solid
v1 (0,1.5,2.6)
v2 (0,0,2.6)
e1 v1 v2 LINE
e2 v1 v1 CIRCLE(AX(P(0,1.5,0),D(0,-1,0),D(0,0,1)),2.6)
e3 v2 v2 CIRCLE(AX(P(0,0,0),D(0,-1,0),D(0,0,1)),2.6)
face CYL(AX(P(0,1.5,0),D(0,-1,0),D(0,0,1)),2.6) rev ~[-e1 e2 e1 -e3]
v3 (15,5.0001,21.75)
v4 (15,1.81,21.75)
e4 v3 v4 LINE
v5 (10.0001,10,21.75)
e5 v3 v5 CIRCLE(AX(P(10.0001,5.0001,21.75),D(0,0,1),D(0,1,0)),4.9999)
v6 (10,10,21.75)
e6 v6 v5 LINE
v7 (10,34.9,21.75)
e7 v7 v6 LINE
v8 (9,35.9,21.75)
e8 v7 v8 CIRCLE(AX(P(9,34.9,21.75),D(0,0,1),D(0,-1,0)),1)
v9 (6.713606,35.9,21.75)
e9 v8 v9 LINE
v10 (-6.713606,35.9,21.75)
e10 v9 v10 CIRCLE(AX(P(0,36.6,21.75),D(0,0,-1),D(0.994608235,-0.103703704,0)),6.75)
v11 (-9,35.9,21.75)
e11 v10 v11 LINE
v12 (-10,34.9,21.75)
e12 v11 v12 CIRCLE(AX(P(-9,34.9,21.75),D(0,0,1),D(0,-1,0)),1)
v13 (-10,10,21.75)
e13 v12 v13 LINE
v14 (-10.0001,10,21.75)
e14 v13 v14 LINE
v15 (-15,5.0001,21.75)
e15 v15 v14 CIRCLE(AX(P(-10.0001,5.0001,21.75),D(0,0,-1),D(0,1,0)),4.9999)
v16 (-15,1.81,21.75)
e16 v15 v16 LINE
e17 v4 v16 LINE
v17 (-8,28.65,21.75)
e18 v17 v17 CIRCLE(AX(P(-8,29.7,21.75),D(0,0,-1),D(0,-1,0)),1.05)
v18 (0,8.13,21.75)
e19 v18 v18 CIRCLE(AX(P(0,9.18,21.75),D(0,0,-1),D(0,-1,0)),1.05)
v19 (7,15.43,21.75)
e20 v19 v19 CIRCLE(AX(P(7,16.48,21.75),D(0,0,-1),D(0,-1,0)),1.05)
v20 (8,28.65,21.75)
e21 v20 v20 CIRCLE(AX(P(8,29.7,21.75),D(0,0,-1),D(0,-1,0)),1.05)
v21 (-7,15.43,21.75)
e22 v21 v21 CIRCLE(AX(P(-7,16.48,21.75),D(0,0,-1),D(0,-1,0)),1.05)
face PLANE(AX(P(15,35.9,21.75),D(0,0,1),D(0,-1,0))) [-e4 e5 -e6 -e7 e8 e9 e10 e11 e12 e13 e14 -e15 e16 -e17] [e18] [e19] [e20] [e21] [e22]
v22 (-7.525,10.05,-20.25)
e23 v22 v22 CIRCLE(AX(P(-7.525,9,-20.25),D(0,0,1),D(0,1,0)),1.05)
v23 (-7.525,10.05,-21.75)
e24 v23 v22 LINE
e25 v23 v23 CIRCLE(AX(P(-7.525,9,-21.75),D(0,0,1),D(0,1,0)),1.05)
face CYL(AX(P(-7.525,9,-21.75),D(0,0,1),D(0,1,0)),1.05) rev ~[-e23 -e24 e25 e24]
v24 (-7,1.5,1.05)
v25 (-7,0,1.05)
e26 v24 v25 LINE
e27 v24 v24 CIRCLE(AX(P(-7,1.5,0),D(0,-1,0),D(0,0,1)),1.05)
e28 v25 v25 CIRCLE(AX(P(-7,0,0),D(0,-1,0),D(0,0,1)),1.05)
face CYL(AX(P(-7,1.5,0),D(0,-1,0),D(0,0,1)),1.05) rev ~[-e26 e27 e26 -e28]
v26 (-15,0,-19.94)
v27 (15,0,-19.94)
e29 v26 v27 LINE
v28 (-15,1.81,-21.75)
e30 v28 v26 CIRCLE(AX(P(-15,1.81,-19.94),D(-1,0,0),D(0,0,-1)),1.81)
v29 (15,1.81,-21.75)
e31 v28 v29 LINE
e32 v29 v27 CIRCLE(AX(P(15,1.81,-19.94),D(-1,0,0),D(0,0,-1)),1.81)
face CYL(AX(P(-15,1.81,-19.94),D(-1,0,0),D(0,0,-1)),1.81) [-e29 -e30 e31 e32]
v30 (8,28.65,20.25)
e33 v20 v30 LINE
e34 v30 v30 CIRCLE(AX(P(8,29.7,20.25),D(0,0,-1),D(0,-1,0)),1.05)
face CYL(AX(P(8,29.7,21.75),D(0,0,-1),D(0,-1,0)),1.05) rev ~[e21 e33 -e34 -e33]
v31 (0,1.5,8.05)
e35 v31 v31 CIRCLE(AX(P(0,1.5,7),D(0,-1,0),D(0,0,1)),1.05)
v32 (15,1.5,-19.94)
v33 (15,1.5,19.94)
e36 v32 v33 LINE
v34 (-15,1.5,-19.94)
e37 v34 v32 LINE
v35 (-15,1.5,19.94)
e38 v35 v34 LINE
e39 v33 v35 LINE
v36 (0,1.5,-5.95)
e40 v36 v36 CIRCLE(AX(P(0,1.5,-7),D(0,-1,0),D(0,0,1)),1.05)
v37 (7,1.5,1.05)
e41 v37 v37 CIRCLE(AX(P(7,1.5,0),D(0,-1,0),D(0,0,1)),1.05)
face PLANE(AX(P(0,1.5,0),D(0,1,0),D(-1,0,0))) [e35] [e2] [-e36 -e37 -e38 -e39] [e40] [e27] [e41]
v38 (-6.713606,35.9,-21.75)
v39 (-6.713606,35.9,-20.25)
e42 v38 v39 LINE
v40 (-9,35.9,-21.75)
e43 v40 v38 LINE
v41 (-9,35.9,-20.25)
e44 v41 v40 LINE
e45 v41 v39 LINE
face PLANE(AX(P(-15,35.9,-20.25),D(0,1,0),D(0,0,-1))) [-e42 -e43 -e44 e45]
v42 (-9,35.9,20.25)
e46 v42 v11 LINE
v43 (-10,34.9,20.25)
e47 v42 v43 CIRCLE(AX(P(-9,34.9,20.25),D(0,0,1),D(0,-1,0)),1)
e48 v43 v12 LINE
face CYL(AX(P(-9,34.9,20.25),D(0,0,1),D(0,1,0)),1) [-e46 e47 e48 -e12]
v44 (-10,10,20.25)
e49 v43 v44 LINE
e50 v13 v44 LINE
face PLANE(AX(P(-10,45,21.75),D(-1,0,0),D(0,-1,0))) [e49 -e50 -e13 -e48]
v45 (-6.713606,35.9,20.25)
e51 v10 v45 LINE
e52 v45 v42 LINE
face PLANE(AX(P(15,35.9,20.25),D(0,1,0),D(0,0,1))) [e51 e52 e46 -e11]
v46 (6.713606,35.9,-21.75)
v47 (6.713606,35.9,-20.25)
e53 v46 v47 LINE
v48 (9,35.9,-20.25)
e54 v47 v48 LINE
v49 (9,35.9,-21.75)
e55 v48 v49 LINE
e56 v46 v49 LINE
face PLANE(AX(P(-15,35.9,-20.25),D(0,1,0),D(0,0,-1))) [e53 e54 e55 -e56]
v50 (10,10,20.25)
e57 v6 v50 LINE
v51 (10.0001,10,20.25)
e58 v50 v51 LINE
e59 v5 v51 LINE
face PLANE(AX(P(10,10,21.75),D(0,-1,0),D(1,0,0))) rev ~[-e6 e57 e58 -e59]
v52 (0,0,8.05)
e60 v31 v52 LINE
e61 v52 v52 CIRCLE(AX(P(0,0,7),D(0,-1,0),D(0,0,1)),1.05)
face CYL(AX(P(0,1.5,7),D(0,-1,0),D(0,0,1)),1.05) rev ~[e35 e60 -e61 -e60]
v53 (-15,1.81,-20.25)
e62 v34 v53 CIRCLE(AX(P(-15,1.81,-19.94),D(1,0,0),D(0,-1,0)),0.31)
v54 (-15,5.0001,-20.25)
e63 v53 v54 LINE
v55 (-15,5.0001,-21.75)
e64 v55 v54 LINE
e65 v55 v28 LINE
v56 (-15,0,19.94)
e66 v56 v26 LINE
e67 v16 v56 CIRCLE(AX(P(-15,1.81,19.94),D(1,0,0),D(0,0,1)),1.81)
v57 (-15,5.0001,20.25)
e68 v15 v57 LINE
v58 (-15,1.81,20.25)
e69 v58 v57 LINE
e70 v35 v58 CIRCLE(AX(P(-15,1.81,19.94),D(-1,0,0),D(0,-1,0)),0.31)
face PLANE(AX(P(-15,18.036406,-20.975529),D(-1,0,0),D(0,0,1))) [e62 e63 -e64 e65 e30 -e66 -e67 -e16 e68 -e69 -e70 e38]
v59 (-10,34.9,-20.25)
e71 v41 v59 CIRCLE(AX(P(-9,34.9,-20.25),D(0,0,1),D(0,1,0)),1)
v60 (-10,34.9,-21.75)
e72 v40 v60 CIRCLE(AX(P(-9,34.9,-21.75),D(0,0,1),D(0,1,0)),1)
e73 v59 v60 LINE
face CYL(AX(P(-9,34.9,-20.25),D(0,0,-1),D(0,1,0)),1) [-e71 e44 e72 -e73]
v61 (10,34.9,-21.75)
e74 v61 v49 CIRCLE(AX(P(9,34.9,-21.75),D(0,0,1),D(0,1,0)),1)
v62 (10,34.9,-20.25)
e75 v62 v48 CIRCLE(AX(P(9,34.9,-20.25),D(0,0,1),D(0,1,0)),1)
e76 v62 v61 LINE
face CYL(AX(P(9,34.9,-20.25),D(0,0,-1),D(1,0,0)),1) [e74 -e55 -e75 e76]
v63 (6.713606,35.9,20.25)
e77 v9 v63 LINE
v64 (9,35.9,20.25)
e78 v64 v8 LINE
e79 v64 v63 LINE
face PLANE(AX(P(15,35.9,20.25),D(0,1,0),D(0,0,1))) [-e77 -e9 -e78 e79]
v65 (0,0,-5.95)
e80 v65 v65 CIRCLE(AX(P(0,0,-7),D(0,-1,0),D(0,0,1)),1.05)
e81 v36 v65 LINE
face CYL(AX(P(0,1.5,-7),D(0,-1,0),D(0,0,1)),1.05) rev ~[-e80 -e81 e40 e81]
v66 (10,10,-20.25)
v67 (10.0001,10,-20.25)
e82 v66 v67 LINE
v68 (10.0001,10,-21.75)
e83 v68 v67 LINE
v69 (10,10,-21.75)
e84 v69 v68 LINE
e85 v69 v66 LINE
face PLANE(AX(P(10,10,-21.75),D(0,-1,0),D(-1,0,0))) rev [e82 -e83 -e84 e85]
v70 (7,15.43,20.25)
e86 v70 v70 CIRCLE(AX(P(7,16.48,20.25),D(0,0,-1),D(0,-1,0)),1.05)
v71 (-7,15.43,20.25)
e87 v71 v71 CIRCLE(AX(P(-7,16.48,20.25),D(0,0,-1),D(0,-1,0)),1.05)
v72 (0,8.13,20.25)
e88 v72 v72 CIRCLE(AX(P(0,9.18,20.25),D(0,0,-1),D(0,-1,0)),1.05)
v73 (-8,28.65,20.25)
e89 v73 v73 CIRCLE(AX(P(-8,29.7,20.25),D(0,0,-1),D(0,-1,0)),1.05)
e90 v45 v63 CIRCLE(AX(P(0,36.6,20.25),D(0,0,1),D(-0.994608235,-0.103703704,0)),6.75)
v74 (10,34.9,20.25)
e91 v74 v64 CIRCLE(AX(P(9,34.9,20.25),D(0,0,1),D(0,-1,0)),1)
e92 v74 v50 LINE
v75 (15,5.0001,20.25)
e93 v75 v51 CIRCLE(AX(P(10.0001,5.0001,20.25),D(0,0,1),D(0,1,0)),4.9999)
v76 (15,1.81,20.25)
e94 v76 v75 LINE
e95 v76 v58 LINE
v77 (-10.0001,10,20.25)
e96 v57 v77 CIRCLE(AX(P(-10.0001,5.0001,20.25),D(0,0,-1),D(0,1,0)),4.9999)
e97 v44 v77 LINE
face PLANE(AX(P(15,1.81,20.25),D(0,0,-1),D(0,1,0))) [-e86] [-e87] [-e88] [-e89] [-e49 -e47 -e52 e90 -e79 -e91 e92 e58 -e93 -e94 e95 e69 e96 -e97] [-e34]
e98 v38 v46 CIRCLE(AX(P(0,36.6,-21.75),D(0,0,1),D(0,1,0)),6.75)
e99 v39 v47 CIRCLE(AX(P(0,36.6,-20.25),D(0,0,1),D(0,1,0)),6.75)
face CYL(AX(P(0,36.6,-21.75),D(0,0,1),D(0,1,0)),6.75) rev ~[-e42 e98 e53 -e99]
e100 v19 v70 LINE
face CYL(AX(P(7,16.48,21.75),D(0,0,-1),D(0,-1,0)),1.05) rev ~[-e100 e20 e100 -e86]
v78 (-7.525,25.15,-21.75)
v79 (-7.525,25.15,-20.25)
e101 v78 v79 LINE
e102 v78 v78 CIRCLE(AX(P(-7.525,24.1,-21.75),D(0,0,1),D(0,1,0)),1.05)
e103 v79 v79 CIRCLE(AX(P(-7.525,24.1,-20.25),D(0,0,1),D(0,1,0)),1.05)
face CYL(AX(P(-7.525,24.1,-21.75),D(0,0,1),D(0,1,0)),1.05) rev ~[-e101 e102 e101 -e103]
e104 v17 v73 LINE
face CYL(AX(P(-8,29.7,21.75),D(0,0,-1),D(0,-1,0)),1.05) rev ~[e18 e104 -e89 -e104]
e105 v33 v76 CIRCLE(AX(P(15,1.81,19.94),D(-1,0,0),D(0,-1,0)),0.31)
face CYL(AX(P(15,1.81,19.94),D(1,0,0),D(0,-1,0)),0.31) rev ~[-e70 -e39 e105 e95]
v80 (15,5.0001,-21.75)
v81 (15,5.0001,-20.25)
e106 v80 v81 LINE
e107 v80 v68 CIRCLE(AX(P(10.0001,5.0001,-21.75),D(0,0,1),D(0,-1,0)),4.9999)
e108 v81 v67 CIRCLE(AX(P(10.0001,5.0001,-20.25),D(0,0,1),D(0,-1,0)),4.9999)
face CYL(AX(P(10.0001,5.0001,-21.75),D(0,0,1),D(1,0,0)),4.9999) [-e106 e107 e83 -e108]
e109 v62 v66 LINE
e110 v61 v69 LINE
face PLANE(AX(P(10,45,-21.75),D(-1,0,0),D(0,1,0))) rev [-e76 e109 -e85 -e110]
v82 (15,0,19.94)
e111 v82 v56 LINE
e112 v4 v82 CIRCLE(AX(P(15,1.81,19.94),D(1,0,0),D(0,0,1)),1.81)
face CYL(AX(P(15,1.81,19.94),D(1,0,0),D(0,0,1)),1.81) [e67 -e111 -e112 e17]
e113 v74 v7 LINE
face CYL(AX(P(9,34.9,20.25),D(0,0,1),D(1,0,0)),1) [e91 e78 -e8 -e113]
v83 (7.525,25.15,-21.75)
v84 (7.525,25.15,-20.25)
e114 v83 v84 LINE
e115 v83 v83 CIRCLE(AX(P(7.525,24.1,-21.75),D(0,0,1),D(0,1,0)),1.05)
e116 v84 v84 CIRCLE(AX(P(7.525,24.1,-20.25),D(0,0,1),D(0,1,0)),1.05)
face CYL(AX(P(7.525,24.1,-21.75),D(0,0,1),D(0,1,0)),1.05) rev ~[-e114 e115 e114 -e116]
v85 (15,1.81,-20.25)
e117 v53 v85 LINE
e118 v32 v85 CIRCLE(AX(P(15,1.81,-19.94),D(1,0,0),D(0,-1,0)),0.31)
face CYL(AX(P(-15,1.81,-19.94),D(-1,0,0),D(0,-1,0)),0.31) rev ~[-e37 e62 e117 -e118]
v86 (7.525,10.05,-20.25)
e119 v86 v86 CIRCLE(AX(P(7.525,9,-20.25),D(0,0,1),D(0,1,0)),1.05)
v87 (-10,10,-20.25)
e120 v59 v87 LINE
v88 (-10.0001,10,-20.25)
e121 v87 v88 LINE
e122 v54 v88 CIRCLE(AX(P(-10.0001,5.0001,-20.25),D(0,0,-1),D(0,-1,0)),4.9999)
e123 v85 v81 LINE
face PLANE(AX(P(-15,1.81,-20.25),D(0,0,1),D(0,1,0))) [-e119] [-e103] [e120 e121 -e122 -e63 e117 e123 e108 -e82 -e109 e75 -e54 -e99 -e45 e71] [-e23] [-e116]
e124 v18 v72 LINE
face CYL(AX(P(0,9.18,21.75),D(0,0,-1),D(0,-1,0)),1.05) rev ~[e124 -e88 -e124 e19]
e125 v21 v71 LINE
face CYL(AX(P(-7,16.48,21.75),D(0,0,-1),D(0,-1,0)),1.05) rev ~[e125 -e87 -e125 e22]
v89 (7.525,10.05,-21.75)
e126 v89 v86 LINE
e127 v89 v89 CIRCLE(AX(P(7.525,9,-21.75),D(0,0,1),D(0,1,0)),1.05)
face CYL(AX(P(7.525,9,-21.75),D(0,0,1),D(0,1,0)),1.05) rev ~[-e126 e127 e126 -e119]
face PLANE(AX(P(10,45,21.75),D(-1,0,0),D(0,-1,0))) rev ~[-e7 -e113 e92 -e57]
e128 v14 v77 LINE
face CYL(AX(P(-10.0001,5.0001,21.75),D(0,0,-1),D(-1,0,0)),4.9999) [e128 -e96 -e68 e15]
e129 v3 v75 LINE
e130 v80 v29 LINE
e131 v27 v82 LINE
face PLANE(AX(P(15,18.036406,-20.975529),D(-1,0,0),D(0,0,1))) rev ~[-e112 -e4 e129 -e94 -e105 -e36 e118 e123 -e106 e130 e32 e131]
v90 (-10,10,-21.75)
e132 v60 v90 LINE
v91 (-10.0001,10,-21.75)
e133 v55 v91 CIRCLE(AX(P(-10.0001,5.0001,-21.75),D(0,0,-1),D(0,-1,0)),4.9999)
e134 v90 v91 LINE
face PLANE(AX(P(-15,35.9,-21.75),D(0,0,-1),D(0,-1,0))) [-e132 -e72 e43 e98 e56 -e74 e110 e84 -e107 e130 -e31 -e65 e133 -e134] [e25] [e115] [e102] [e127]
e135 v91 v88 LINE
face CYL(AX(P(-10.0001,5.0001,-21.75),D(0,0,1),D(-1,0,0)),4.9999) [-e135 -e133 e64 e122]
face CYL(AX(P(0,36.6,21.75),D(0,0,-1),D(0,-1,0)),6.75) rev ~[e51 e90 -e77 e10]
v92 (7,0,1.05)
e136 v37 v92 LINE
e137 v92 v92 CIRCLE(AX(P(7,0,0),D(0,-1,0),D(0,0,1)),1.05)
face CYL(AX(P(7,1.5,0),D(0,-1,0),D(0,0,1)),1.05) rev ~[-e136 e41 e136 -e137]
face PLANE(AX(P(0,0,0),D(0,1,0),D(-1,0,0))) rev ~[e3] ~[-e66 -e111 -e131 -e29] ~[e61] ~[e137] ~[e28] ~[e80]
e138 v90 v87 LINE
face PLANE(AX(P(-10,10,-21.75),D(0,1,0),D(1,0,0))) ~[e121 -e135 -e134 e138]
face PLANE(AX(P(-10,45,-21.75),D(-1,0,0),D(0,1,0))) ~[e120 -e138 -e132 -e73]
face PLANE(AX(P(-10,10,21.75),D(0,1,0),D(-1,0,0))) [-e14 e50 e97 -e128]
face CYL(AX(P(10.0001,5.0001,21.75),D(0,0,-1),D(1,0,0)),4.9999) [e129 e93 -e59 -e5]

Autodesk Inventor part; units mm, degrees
ref_plane "YZ Plane" through (0, 0, 0) normal (1, 0, 0) x (0, 1, 0)
ref_plane "XZ Plane" through (0, 0, 0) normal (0, 1, 0) x (-1, 0, 0)
ref_plane "XY Plane" through (0, 0, 0) normal (0, 0, 1) x (1, 0, 0)
sketch "Sketch1" plane through (0, 0, 0) normal (0, 1, 0) x (-1, 0, 0)
  line L0 (-15, 20.25) -> (15, 20.25)
  line L1 (15, 20.25) -> (15, -20.25)
  line L2 (15, -20.25) -> (-15, -20.25)
  line L3 (-15, -20.25) -> (-15, 20.25)
  line L4 (-15, 20.25) -> (15, -20.25) construction
  line L5 (15, 20.25) -> (-15, -20.25) construction
  point P0 (0, 0)
  dimension "d0" = 40.5
  dimension "d1" = 30
extrude "Plate1" add sketch "Sketch1" along normal blind 1.5
sketch "Sketch2" plane through (-15, 0, -21.75) normal (0, 0, 1) x (1, 0, 0)
  line L0 (30, 0) -> (0, 0)
  line L1 (0, 0) -> (0, 35.9)
  line L2 (0, 35.9) -> (30, 35.9)
  line L3 (30, 35.9) -> (30, 0)
edge flange "Flange1" height 35.9 angle 90 thickness 1.5 bend radius 0.31 thickness toward (0, 0, 1) relief tear relief width 1.5 relief depth 0.75 corner gap 0.31 corner form 0 edges at (0, 1.5, -20.25) (0, 1.5, 20.25) wall of the first edge with corners at (15, 0, -21.75) (-15, 0, -21.75) (-15, 35.9, -21.75) (15, 35.9, -21.75)
bend "Bend1"
corner "Corner1"
sketch "Sketch3" plane through (0, 1.5, 0) normal (0, 1, 0) x (1, 0, 0)
  circle A0 centre (7, 0) radius 0.7835 projected
  circle A1 centre (0, -7) radius 0.7835 projected
  circle A2 centre (-7, 0) radius 0.7835 projected
  circle A3 centre (0, 7) radius 0.7835 projected
  point P0 (0, 0)
hole "Hole1" at (0, 1.5, 7) at (7, 1.5, 0) at (-7, 1.5, 0) at (0, 1.5, -7) direction (0, -1, 0) diameter 2.1 depth 1.5
sketch "Sketch26" plane through (-15, 35.9, 21.75) normal (0, 0, 1) x (1, 0, 0)
  line L0 (30, 9.1) -> (25, 9.1)
  line L1 (25, 9.1) -> (25, -25.9)
  line L2 (25, -25.9) -> (30, -25.9)
  line L3 (30, -25.9) -> (30, 9.1)
  line L4 (0, 9.1) -> (5, 9.1)
  line L5 (5, 9.1) -> (5, -25.9)
  line L6 (5, -25.9) -> (0, -25.9)
  line L7 (0, -25.9) -> (0, 9.1)
  point P0 (15, -35.9)
  dimension "d91" = 35
  dimension "d92" = 5
  dimension "d93" = 10
  dimension "d94" = 10
  dimension "d95" = 5
  dimension "d96" = 35
  dimension "d97" = 10
  dimension "d98" = 10
extrude "Cut11" cut sketch "Sketch26" against normal blind 1.5
fillet "Corner Round1" radius 5 1 edges at (-15, 10, 21)
fillet "Corner Round2" radius 5 1 edges at (15, 10, 21)
mirror "Mirror1" about plane through (0, 0, 0) normal (0, 0, 1) of "Cut11"
fillet "Corner Round3" radius 5 1 edges at (-15, 10, -21)
fillet "Corner Round4" radius 5 1 edges at (15, 10, -21)
fillet "Corner Round5" radius 1 4 edges at (10, 35.9, -21) (10, 35.9, 21) (-10, 35.9, 21) (-10, 35.9, -21)
sketch "Sketch31" plane through (-15, 1.81, 21.75) normal (0, 0, 1) x (1, 0, 0)
  point P0 (15, -1.81)
sketch "Sketch34" plane through (0, 1.5, 0) normal (0, 1, 0) x (1, 0, 0)
  circle A0 centre (0, 0) radius 1.2295
  point P0 (0, 0)
hole "Hole13" at (0, 1.5, 0) direction (0, -1, 0) diameter 5.2 depth 1.5
sketch "Sketch35" plane through (-15, 1.81, 21.75) normal (0, 0, 1) x (1, 0, 0)
  circle A0 centre (15, 34.79) radius 2.925
  point P0 (15, -1.81)
hole "Hole16" at (0, 36.6, 21.75) direction (0, 0, -1) diameter 13.5 depth 1.5
sketch "Sketch36" plane through (15, 1.81, -21.75) normal (0, 0, -1) x (-1, 0, 0)
  circle A0 centre (15, 34.79) radius 4.48
  point P0 (15, -1.81)
hole "Hole17" at (0, 36.6, -21.75) direction (0, 0, 1) diameter 13.5 depth 1.5
sketch "Sketch37" plane through (-15, 1.81, 21.75) normal (0, 0, 1) x (1, 0, 0)
  circle A0 centre (23, 27.89) radius 0.7835
  circle A1 centre (22, 14.67) radius 0.7835
  circle A2 centre (15, 7.37) radius 0.7835
  circle A3 centre (8, 14.67) radius 0.7835
  circle A4 centre (7, 27.89) radius 0.7835
  point P0 (15, -1.81)
hole "Hole18" at (8, 29.7, 21.75) at (-8, 29.7, 21.75) at (7, 16.48, 21.75) at (-7, 16.48, 21.75) at (0, 9.18, 21.75) direction (0, 0, -1) diameter 2.1 depth 1.5
sketch "Sketch38" plane through (15, 1.81, -21.75) normal (0, 0, -1) x (-1, 0, 0)
  circle A0 centre (7.475, 7.19) radius 0.7835
  circle A1 centre (7.475, 22.29) radius 0.7835
  circle A2 centre (22.525, 7.19) radius 0.7835
  circle A3 centre (22.525, 22.29) radius 0.7835
  point P0 (15, -1.81)
hole "Hole19" at (7.525, 9, -21.75) at (7.525, 24.1, -21.75) at (-7.525, 9, -21.75) at (-7.525, 24.1, -21.75) direction (0, 0, 1) diameter 2.1 depth 1.5
equation "\"d18\" = Thickness"
equation "\"d99\" = Thickness"
equation "\"d143\" = Thickness"
equation "\"d164\" = Thickness"
equation "\"d171\" = Thickness"
equation "\"d178\" = Thickness"
equation "\"d185\" = Thickness"
equation "\"d2\" = Thickness"
equation "\"d3\" = BendReliefWidth"
equation "\"d4\" = BendReliefDepth"
equation "\"d5\" = MinimumRemnant"
equation "\"d6\" = TransitionRadius"
equation "\"d9\" = BendRadius"
equation "\"d10\" = CornerReliefSize"
equation "\"d11\" = GapSize"
equation "\"d12\" = JacobiRadiusSize"
equation "\"BendReliefWidth\" = Thickness"
equation "\"BendReliefDepth\" = 0.5 * Thickness"
equation "\"CornerReliefSize\" = 4 * Thickness"
equation "\"MinimumRemnant\" = 2 * Thickness"
equation "\"TransitionRadius\" = BendRadius"
equation "\"JacobiRadiusSize\" = BendRadius"
equation "\"GapSize\" = Thickness"
equation "\"Thickness\" = 1.5"
equation "\"BendRadius\" = 0.31"
properties part number "axis_19_top_frame" material "Aluminum 6061-AHC"
